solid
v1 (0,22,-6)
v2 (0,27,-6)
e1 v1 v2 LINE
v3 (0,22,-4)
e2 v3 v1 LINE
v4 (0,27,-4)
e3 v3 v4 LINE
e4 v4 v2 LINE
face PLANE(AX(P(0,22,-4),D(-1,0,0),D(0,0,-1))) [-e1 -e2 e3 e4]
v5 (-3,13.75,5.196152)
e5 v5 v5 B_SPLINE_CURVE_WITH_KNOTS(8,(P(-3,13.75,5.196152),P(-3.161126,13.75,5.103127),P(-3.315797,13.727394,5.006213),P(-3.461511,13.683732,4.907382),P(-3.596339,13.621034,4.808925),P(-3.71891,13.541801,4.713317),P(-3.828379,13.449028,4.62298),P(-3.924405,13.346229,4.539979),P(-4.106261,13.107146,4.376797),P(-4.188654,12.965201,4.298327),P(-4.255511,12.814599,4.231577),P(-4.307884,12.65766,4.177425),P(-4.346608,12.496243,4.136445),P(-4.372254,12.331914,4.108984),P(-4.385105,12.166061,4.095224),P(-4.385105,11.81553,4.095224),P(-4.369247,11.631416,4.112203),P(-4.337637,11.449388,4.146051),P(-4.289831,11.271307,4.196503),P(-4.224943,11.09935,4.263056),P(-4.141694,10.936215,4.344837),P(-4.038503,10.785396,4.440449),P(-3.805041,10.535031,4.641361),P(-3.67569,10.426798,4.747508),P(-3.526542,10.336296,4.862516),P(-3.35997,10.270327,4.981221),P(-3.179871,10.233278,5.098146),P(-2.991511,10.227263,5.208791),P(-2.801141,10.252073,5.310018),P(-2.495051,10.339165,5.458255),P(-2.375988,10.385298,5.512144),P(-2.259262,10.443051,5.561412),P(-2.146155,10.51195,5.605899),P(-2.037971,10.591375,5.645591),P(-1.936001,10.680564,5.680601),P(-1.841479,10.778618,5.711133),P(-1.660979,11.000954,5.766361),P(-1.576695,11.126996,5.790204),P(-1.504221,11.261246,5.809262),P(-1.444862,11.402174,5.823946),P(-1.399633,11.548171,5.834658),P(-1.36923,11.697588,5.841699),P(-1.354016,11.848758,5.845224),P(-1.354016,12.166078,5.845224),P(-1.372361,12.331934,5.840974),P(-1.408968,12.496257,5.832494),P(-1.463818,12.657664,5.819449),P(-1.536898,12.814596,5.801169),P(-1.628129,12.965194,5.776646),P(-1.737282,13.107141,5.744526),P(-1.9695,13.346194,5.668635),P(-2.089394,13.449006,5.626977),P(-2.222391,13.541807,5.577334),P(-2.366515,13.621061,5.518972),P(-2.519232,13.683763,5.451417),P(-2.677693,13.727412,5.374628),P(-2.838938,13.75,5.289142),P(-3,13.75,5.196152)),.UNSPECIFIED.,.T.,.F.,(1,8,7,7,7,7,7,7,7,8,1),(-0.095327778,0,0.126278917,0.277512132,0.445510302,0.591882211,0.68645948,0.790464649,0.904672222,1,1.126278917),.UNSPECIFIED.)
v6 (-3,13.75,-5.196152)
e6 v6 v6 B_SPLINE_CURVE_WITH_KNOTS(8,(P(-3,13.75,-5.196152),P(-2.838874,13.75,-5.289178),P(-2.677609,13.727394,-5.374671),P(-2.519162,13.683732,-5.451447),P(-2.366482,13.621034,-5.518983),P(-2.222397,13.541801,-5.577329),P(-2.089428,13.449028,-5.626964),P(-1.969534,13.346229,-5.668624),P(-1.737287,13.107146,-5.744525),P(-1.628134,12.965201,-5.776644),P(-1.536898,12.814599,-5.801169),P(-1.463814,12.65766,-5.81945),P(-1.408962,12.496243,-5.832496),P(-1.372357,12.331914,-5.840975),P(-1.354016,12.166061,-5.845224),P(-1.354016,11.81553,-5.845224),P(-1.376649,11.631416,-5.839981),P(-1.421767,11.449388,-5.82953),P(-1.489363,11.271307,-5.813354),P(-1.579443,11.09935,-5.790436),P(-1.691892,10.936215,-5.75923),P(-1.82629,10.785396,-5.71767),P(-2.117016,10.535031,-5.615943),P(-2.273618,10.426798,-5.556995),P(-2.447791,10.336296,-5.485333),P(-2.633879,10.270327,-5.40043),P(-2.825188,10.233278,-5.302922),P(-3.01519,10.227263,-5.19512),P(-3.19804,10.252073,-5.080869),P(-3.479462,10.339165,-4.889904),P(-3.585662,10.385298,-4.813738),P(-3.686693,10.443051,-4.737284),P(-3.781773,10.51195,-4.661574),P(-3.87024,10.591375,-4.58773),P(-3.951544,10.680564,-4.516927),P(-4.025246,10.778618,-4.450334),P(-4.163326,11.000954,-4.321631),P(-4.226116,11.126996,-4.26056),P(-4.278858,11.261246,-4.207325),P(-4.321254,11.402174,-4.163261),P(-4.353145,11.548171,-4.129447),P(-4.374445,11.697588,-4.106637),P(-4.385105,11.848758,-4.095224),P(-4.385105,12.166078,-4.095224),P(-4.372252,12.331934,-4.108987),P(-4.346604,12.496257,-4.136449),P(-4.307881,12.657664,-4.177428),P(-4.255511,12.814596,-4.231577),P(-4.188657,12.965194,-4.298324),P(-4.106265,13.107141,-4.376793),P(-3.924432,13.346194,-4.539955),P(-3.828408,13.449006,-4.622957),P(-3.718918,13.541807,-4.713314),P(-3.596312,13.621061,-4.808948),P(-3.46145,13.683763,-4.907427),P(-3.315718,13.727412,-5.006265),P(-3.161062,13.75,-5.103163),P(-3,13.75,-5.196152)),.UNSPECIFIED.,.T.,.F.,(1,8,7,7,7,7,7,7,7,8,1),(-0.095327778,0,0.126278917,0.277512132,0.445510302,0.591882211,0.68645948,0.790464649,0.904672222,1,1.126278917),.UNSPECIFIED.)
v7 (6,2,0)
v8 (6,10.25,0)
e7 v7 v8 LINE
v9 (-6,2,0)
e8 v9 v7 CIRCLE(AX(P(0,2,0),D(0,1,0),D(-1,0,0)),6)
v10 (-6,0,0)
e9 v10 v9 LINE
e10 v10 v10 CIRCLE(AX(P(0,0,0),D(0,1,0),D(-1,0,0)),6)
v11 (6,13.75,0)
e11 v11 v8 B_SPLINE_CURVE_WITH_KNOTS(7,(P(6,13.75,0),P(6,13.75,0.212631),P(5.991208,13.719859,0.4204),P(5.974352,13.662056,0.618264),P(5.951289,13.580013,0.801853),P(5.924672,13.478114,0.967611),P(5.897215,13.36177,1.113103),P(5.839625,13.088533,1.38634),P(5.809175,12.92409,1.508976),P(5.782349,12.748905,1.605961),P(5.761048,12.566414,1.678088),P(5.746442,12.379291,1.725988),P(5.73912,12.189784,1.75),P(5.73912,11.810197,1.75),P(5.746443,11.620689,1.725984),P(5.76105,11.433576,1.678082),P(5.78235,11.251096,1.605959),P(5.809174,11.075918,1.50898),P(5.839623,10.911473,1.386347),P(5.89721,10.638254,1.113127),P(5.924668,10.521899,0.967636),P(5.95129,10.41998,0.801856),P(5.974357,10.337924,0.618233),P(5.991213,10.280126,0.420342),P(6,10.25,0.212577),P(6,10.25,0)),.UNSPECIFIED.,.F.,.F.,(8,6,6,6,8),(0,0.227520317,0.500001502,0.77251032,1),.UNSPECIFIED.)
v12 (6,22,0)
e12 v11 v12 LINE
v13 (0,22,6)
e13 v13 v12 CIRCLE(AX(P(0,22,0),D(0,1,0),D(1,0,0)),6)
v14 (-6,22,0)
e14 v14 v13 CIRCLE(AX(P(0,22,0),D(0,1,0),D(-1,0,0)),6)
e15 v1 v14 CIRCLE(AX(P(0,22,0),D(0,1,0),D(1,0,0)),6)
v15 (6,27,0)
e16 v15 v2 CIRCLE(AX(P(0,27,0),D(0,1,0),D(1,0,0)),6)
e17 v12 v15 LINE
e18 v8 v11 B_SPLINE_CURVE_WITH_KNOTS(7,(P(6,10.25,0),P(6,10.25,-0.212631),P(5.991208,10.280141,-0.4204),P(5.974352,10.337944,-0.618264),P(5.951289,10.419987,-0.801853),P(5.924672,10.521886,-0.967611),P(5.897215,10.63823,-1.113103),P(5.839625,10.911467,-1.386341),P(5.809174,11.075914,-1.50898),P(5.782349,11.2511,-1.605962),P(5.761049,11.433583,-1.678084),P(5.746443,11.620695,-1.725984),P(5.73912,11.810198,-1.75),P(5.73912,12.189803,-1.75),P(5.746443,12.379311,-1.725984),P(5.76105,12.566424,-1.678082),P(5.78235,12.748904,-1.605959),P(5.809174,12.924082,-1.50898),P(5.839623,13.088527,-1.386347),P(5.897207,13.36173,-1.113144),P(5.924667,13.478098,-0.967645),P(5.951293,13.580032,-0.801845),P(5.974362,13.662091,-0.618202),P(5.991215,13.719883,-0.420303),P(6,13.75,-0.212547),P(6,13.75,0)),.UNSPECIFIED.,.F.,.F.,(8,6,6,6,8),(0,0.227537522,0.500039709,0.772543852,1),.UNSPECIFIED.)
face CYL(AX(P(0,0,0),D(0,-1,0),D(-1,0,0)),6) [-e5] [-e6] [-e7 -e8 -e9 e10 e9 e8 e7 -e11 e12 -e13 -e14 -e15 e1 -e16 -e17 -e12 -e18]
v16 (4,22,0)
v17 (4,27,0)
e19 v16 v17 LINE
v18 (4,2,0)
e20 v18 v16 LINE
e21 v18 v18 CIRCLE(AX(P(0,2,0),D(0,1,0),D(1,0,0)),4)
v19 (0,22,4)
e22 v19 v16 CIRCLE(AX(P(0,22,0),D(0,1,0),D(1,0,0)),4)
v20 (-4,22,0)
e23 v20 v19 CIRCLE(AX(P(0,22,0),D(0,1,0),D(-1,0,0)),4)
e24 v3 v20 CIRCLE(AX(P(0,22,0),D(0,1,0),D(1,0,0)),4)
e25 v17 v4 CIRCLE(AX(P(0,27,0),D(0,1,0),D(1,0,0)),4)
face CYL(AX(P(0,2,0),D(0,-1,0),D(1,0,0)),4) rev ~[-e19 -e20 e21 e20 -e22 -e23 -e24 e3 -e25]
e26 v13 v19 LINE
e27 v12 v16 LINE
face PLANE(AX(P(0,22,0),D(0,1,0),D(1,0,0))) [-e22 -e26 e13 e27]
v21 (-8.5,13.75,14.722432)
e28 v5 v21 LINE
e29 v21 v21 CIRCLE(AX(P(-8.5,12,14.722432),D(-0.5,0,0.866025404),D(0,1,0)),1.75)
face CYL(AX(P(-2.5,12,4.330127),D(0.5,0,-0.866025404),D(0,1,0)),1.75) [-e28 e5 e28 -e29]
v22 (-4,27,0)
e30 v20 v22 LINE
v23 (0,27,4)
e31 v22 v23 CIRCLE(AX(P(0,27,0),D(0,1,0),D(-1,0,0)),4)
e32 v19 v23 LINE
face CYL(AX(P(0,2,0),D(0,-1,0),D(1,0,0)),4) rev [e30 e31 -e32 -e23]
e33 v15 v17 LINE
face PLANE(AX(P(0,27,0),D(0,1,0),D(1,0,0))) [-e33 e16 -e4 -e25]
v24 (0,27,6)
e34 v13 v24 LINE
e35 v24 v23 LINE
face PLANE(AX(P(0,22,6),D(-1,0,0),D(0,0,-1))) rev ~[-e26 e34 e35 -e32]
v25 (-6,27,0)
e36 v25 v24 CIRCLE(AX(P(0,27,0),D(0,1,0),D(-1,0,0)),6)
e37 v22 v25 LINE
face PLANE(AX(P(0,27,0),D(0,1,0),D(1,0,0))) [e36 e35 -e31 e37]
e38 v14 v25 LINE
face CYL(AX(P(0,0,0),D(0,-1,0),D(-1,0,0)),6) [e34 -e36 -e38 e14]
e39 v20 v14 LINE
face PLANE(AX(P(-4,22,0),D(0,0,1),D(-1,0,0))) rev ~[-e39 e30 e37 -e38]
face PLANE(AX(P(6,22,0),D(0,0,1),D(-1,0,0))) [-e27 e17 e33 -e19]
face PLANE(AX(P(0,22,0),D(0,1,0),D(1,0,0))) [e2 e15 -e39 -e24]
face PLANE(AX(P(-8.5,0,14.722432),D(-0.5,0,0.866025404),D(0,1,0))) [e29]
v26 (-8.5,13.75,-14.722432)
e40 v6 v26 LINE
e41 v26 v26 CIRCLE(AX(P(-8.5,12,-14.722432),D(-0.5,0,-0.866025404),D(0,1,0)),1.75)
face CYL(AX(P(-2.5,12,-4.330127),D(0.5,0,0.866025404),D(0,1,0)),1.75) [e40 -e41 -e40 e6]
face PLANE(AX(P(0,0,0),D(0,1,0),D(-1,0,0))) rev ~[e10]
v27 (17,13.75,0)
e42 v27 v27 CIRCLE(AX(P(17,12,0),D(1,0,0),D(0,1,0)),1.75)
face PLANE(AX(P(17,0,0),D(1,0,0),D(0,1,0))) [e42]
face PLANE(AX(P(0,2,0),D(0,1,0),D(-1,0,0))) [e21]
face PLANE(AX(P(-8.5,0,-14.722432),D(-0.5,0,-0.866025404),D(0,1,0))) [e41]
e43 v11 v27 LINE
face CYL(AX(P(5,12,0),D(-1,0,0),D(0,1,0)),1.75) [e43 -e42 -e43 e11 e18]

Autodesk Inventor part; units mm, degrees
ref_plane "XZ Plane" through (0, 0, 0) normal (0, 1, 0) x (-1, 0, 0)
ref_plane "XY Plane" through (0, 0, 0) normal (0, 0, 1) x (1, 0, 0)
sketch "Sketch1" plane through (0, 0, 0) normal (0, 1, 0) x (-1, 0, 0)
  circle A0 centre (0, 0) radius 6
  dimension "d0" = 12
extrude "Extrusion1" add sketch "Sketch1" along normal blind 2
sketch "Sketch2" plane through (0, 2, 0) normal (0, 1, 0) x (1, 0, 0)
  circle A0 centre (0, 0) radius 4
  circle A1 centre (0, 0) radius 6
  dimension "d3" = 8
extrude "Extrusion2" add sketch "Sketch2" along normal blind 20
sketch "Sketch3" plane through (0, 22, 0) normal (0, 1, 0) x (1, 0, 0)
  arc A0 (-6, 0) -> (0, -6) centre (0, 0) ccw
  circle A1 centre (0, 0) radius 6 construction
  arc A2 (6, 0) -> (0, 6) centre (0, 0) ccw
  line L0 (0, -6) -> (0, -4)
  circle A3 centre (0, 0) radius 4 construction
  line L1 (0, 4) -> (0, 6)
  line L2 (6, 0) -> (4, 0)
  line L3 (-4, 0) -> (-6, 0)
  arc A4 (-4, 0) -> (0, -4) centre (0, 0) ccw
  arc A5 (4, 0) -> (0, 4) centre (0, 0) ccw
extrude "Extrusion3" add sketch "Sketch3" along normal blind 5
ref_plane "Work Plane1" through (5, 0, 0) normal (1, 0, 0) x (0, 1, 0)
sketch "Sketch5" plane through (5, 0, 0) normal (1, 0, 0) x (0, 1, 0)
  line L0 (22, 0) -> (22, 6) construction
  line L1 (22, 6) -> (2, -6) construction
  line L2 (22, -6) -> (22, 0) construction
  line L3 (22, -6) -> (2, 6) construction
  circle A0 centre (12, 0) radius 1.75
  point P0 (0, 0)
  dimension "d10" = 3.5
extrude "Extrusion4" add sketch "Sketch5" along normal blind 12
pattern_circular "Circular Pattern1" count 3 over 360 about axis through (0, 0, 0) along (0, 1, 0) of "Extrusion4"
thread "Thread1" size "M3.5x0.6" class "6g" standard "ANSI Metric M Profile" length 10
thread "Thread2" size "M3.5x0.6" class "6g" standard "ANSI Metric M Profile" length 10
thread "Thread3" size "M3.5x0.6" class "6g" standard "ANSI Metric M Profile" length 10
properties part number "UntererRührerHalter"
